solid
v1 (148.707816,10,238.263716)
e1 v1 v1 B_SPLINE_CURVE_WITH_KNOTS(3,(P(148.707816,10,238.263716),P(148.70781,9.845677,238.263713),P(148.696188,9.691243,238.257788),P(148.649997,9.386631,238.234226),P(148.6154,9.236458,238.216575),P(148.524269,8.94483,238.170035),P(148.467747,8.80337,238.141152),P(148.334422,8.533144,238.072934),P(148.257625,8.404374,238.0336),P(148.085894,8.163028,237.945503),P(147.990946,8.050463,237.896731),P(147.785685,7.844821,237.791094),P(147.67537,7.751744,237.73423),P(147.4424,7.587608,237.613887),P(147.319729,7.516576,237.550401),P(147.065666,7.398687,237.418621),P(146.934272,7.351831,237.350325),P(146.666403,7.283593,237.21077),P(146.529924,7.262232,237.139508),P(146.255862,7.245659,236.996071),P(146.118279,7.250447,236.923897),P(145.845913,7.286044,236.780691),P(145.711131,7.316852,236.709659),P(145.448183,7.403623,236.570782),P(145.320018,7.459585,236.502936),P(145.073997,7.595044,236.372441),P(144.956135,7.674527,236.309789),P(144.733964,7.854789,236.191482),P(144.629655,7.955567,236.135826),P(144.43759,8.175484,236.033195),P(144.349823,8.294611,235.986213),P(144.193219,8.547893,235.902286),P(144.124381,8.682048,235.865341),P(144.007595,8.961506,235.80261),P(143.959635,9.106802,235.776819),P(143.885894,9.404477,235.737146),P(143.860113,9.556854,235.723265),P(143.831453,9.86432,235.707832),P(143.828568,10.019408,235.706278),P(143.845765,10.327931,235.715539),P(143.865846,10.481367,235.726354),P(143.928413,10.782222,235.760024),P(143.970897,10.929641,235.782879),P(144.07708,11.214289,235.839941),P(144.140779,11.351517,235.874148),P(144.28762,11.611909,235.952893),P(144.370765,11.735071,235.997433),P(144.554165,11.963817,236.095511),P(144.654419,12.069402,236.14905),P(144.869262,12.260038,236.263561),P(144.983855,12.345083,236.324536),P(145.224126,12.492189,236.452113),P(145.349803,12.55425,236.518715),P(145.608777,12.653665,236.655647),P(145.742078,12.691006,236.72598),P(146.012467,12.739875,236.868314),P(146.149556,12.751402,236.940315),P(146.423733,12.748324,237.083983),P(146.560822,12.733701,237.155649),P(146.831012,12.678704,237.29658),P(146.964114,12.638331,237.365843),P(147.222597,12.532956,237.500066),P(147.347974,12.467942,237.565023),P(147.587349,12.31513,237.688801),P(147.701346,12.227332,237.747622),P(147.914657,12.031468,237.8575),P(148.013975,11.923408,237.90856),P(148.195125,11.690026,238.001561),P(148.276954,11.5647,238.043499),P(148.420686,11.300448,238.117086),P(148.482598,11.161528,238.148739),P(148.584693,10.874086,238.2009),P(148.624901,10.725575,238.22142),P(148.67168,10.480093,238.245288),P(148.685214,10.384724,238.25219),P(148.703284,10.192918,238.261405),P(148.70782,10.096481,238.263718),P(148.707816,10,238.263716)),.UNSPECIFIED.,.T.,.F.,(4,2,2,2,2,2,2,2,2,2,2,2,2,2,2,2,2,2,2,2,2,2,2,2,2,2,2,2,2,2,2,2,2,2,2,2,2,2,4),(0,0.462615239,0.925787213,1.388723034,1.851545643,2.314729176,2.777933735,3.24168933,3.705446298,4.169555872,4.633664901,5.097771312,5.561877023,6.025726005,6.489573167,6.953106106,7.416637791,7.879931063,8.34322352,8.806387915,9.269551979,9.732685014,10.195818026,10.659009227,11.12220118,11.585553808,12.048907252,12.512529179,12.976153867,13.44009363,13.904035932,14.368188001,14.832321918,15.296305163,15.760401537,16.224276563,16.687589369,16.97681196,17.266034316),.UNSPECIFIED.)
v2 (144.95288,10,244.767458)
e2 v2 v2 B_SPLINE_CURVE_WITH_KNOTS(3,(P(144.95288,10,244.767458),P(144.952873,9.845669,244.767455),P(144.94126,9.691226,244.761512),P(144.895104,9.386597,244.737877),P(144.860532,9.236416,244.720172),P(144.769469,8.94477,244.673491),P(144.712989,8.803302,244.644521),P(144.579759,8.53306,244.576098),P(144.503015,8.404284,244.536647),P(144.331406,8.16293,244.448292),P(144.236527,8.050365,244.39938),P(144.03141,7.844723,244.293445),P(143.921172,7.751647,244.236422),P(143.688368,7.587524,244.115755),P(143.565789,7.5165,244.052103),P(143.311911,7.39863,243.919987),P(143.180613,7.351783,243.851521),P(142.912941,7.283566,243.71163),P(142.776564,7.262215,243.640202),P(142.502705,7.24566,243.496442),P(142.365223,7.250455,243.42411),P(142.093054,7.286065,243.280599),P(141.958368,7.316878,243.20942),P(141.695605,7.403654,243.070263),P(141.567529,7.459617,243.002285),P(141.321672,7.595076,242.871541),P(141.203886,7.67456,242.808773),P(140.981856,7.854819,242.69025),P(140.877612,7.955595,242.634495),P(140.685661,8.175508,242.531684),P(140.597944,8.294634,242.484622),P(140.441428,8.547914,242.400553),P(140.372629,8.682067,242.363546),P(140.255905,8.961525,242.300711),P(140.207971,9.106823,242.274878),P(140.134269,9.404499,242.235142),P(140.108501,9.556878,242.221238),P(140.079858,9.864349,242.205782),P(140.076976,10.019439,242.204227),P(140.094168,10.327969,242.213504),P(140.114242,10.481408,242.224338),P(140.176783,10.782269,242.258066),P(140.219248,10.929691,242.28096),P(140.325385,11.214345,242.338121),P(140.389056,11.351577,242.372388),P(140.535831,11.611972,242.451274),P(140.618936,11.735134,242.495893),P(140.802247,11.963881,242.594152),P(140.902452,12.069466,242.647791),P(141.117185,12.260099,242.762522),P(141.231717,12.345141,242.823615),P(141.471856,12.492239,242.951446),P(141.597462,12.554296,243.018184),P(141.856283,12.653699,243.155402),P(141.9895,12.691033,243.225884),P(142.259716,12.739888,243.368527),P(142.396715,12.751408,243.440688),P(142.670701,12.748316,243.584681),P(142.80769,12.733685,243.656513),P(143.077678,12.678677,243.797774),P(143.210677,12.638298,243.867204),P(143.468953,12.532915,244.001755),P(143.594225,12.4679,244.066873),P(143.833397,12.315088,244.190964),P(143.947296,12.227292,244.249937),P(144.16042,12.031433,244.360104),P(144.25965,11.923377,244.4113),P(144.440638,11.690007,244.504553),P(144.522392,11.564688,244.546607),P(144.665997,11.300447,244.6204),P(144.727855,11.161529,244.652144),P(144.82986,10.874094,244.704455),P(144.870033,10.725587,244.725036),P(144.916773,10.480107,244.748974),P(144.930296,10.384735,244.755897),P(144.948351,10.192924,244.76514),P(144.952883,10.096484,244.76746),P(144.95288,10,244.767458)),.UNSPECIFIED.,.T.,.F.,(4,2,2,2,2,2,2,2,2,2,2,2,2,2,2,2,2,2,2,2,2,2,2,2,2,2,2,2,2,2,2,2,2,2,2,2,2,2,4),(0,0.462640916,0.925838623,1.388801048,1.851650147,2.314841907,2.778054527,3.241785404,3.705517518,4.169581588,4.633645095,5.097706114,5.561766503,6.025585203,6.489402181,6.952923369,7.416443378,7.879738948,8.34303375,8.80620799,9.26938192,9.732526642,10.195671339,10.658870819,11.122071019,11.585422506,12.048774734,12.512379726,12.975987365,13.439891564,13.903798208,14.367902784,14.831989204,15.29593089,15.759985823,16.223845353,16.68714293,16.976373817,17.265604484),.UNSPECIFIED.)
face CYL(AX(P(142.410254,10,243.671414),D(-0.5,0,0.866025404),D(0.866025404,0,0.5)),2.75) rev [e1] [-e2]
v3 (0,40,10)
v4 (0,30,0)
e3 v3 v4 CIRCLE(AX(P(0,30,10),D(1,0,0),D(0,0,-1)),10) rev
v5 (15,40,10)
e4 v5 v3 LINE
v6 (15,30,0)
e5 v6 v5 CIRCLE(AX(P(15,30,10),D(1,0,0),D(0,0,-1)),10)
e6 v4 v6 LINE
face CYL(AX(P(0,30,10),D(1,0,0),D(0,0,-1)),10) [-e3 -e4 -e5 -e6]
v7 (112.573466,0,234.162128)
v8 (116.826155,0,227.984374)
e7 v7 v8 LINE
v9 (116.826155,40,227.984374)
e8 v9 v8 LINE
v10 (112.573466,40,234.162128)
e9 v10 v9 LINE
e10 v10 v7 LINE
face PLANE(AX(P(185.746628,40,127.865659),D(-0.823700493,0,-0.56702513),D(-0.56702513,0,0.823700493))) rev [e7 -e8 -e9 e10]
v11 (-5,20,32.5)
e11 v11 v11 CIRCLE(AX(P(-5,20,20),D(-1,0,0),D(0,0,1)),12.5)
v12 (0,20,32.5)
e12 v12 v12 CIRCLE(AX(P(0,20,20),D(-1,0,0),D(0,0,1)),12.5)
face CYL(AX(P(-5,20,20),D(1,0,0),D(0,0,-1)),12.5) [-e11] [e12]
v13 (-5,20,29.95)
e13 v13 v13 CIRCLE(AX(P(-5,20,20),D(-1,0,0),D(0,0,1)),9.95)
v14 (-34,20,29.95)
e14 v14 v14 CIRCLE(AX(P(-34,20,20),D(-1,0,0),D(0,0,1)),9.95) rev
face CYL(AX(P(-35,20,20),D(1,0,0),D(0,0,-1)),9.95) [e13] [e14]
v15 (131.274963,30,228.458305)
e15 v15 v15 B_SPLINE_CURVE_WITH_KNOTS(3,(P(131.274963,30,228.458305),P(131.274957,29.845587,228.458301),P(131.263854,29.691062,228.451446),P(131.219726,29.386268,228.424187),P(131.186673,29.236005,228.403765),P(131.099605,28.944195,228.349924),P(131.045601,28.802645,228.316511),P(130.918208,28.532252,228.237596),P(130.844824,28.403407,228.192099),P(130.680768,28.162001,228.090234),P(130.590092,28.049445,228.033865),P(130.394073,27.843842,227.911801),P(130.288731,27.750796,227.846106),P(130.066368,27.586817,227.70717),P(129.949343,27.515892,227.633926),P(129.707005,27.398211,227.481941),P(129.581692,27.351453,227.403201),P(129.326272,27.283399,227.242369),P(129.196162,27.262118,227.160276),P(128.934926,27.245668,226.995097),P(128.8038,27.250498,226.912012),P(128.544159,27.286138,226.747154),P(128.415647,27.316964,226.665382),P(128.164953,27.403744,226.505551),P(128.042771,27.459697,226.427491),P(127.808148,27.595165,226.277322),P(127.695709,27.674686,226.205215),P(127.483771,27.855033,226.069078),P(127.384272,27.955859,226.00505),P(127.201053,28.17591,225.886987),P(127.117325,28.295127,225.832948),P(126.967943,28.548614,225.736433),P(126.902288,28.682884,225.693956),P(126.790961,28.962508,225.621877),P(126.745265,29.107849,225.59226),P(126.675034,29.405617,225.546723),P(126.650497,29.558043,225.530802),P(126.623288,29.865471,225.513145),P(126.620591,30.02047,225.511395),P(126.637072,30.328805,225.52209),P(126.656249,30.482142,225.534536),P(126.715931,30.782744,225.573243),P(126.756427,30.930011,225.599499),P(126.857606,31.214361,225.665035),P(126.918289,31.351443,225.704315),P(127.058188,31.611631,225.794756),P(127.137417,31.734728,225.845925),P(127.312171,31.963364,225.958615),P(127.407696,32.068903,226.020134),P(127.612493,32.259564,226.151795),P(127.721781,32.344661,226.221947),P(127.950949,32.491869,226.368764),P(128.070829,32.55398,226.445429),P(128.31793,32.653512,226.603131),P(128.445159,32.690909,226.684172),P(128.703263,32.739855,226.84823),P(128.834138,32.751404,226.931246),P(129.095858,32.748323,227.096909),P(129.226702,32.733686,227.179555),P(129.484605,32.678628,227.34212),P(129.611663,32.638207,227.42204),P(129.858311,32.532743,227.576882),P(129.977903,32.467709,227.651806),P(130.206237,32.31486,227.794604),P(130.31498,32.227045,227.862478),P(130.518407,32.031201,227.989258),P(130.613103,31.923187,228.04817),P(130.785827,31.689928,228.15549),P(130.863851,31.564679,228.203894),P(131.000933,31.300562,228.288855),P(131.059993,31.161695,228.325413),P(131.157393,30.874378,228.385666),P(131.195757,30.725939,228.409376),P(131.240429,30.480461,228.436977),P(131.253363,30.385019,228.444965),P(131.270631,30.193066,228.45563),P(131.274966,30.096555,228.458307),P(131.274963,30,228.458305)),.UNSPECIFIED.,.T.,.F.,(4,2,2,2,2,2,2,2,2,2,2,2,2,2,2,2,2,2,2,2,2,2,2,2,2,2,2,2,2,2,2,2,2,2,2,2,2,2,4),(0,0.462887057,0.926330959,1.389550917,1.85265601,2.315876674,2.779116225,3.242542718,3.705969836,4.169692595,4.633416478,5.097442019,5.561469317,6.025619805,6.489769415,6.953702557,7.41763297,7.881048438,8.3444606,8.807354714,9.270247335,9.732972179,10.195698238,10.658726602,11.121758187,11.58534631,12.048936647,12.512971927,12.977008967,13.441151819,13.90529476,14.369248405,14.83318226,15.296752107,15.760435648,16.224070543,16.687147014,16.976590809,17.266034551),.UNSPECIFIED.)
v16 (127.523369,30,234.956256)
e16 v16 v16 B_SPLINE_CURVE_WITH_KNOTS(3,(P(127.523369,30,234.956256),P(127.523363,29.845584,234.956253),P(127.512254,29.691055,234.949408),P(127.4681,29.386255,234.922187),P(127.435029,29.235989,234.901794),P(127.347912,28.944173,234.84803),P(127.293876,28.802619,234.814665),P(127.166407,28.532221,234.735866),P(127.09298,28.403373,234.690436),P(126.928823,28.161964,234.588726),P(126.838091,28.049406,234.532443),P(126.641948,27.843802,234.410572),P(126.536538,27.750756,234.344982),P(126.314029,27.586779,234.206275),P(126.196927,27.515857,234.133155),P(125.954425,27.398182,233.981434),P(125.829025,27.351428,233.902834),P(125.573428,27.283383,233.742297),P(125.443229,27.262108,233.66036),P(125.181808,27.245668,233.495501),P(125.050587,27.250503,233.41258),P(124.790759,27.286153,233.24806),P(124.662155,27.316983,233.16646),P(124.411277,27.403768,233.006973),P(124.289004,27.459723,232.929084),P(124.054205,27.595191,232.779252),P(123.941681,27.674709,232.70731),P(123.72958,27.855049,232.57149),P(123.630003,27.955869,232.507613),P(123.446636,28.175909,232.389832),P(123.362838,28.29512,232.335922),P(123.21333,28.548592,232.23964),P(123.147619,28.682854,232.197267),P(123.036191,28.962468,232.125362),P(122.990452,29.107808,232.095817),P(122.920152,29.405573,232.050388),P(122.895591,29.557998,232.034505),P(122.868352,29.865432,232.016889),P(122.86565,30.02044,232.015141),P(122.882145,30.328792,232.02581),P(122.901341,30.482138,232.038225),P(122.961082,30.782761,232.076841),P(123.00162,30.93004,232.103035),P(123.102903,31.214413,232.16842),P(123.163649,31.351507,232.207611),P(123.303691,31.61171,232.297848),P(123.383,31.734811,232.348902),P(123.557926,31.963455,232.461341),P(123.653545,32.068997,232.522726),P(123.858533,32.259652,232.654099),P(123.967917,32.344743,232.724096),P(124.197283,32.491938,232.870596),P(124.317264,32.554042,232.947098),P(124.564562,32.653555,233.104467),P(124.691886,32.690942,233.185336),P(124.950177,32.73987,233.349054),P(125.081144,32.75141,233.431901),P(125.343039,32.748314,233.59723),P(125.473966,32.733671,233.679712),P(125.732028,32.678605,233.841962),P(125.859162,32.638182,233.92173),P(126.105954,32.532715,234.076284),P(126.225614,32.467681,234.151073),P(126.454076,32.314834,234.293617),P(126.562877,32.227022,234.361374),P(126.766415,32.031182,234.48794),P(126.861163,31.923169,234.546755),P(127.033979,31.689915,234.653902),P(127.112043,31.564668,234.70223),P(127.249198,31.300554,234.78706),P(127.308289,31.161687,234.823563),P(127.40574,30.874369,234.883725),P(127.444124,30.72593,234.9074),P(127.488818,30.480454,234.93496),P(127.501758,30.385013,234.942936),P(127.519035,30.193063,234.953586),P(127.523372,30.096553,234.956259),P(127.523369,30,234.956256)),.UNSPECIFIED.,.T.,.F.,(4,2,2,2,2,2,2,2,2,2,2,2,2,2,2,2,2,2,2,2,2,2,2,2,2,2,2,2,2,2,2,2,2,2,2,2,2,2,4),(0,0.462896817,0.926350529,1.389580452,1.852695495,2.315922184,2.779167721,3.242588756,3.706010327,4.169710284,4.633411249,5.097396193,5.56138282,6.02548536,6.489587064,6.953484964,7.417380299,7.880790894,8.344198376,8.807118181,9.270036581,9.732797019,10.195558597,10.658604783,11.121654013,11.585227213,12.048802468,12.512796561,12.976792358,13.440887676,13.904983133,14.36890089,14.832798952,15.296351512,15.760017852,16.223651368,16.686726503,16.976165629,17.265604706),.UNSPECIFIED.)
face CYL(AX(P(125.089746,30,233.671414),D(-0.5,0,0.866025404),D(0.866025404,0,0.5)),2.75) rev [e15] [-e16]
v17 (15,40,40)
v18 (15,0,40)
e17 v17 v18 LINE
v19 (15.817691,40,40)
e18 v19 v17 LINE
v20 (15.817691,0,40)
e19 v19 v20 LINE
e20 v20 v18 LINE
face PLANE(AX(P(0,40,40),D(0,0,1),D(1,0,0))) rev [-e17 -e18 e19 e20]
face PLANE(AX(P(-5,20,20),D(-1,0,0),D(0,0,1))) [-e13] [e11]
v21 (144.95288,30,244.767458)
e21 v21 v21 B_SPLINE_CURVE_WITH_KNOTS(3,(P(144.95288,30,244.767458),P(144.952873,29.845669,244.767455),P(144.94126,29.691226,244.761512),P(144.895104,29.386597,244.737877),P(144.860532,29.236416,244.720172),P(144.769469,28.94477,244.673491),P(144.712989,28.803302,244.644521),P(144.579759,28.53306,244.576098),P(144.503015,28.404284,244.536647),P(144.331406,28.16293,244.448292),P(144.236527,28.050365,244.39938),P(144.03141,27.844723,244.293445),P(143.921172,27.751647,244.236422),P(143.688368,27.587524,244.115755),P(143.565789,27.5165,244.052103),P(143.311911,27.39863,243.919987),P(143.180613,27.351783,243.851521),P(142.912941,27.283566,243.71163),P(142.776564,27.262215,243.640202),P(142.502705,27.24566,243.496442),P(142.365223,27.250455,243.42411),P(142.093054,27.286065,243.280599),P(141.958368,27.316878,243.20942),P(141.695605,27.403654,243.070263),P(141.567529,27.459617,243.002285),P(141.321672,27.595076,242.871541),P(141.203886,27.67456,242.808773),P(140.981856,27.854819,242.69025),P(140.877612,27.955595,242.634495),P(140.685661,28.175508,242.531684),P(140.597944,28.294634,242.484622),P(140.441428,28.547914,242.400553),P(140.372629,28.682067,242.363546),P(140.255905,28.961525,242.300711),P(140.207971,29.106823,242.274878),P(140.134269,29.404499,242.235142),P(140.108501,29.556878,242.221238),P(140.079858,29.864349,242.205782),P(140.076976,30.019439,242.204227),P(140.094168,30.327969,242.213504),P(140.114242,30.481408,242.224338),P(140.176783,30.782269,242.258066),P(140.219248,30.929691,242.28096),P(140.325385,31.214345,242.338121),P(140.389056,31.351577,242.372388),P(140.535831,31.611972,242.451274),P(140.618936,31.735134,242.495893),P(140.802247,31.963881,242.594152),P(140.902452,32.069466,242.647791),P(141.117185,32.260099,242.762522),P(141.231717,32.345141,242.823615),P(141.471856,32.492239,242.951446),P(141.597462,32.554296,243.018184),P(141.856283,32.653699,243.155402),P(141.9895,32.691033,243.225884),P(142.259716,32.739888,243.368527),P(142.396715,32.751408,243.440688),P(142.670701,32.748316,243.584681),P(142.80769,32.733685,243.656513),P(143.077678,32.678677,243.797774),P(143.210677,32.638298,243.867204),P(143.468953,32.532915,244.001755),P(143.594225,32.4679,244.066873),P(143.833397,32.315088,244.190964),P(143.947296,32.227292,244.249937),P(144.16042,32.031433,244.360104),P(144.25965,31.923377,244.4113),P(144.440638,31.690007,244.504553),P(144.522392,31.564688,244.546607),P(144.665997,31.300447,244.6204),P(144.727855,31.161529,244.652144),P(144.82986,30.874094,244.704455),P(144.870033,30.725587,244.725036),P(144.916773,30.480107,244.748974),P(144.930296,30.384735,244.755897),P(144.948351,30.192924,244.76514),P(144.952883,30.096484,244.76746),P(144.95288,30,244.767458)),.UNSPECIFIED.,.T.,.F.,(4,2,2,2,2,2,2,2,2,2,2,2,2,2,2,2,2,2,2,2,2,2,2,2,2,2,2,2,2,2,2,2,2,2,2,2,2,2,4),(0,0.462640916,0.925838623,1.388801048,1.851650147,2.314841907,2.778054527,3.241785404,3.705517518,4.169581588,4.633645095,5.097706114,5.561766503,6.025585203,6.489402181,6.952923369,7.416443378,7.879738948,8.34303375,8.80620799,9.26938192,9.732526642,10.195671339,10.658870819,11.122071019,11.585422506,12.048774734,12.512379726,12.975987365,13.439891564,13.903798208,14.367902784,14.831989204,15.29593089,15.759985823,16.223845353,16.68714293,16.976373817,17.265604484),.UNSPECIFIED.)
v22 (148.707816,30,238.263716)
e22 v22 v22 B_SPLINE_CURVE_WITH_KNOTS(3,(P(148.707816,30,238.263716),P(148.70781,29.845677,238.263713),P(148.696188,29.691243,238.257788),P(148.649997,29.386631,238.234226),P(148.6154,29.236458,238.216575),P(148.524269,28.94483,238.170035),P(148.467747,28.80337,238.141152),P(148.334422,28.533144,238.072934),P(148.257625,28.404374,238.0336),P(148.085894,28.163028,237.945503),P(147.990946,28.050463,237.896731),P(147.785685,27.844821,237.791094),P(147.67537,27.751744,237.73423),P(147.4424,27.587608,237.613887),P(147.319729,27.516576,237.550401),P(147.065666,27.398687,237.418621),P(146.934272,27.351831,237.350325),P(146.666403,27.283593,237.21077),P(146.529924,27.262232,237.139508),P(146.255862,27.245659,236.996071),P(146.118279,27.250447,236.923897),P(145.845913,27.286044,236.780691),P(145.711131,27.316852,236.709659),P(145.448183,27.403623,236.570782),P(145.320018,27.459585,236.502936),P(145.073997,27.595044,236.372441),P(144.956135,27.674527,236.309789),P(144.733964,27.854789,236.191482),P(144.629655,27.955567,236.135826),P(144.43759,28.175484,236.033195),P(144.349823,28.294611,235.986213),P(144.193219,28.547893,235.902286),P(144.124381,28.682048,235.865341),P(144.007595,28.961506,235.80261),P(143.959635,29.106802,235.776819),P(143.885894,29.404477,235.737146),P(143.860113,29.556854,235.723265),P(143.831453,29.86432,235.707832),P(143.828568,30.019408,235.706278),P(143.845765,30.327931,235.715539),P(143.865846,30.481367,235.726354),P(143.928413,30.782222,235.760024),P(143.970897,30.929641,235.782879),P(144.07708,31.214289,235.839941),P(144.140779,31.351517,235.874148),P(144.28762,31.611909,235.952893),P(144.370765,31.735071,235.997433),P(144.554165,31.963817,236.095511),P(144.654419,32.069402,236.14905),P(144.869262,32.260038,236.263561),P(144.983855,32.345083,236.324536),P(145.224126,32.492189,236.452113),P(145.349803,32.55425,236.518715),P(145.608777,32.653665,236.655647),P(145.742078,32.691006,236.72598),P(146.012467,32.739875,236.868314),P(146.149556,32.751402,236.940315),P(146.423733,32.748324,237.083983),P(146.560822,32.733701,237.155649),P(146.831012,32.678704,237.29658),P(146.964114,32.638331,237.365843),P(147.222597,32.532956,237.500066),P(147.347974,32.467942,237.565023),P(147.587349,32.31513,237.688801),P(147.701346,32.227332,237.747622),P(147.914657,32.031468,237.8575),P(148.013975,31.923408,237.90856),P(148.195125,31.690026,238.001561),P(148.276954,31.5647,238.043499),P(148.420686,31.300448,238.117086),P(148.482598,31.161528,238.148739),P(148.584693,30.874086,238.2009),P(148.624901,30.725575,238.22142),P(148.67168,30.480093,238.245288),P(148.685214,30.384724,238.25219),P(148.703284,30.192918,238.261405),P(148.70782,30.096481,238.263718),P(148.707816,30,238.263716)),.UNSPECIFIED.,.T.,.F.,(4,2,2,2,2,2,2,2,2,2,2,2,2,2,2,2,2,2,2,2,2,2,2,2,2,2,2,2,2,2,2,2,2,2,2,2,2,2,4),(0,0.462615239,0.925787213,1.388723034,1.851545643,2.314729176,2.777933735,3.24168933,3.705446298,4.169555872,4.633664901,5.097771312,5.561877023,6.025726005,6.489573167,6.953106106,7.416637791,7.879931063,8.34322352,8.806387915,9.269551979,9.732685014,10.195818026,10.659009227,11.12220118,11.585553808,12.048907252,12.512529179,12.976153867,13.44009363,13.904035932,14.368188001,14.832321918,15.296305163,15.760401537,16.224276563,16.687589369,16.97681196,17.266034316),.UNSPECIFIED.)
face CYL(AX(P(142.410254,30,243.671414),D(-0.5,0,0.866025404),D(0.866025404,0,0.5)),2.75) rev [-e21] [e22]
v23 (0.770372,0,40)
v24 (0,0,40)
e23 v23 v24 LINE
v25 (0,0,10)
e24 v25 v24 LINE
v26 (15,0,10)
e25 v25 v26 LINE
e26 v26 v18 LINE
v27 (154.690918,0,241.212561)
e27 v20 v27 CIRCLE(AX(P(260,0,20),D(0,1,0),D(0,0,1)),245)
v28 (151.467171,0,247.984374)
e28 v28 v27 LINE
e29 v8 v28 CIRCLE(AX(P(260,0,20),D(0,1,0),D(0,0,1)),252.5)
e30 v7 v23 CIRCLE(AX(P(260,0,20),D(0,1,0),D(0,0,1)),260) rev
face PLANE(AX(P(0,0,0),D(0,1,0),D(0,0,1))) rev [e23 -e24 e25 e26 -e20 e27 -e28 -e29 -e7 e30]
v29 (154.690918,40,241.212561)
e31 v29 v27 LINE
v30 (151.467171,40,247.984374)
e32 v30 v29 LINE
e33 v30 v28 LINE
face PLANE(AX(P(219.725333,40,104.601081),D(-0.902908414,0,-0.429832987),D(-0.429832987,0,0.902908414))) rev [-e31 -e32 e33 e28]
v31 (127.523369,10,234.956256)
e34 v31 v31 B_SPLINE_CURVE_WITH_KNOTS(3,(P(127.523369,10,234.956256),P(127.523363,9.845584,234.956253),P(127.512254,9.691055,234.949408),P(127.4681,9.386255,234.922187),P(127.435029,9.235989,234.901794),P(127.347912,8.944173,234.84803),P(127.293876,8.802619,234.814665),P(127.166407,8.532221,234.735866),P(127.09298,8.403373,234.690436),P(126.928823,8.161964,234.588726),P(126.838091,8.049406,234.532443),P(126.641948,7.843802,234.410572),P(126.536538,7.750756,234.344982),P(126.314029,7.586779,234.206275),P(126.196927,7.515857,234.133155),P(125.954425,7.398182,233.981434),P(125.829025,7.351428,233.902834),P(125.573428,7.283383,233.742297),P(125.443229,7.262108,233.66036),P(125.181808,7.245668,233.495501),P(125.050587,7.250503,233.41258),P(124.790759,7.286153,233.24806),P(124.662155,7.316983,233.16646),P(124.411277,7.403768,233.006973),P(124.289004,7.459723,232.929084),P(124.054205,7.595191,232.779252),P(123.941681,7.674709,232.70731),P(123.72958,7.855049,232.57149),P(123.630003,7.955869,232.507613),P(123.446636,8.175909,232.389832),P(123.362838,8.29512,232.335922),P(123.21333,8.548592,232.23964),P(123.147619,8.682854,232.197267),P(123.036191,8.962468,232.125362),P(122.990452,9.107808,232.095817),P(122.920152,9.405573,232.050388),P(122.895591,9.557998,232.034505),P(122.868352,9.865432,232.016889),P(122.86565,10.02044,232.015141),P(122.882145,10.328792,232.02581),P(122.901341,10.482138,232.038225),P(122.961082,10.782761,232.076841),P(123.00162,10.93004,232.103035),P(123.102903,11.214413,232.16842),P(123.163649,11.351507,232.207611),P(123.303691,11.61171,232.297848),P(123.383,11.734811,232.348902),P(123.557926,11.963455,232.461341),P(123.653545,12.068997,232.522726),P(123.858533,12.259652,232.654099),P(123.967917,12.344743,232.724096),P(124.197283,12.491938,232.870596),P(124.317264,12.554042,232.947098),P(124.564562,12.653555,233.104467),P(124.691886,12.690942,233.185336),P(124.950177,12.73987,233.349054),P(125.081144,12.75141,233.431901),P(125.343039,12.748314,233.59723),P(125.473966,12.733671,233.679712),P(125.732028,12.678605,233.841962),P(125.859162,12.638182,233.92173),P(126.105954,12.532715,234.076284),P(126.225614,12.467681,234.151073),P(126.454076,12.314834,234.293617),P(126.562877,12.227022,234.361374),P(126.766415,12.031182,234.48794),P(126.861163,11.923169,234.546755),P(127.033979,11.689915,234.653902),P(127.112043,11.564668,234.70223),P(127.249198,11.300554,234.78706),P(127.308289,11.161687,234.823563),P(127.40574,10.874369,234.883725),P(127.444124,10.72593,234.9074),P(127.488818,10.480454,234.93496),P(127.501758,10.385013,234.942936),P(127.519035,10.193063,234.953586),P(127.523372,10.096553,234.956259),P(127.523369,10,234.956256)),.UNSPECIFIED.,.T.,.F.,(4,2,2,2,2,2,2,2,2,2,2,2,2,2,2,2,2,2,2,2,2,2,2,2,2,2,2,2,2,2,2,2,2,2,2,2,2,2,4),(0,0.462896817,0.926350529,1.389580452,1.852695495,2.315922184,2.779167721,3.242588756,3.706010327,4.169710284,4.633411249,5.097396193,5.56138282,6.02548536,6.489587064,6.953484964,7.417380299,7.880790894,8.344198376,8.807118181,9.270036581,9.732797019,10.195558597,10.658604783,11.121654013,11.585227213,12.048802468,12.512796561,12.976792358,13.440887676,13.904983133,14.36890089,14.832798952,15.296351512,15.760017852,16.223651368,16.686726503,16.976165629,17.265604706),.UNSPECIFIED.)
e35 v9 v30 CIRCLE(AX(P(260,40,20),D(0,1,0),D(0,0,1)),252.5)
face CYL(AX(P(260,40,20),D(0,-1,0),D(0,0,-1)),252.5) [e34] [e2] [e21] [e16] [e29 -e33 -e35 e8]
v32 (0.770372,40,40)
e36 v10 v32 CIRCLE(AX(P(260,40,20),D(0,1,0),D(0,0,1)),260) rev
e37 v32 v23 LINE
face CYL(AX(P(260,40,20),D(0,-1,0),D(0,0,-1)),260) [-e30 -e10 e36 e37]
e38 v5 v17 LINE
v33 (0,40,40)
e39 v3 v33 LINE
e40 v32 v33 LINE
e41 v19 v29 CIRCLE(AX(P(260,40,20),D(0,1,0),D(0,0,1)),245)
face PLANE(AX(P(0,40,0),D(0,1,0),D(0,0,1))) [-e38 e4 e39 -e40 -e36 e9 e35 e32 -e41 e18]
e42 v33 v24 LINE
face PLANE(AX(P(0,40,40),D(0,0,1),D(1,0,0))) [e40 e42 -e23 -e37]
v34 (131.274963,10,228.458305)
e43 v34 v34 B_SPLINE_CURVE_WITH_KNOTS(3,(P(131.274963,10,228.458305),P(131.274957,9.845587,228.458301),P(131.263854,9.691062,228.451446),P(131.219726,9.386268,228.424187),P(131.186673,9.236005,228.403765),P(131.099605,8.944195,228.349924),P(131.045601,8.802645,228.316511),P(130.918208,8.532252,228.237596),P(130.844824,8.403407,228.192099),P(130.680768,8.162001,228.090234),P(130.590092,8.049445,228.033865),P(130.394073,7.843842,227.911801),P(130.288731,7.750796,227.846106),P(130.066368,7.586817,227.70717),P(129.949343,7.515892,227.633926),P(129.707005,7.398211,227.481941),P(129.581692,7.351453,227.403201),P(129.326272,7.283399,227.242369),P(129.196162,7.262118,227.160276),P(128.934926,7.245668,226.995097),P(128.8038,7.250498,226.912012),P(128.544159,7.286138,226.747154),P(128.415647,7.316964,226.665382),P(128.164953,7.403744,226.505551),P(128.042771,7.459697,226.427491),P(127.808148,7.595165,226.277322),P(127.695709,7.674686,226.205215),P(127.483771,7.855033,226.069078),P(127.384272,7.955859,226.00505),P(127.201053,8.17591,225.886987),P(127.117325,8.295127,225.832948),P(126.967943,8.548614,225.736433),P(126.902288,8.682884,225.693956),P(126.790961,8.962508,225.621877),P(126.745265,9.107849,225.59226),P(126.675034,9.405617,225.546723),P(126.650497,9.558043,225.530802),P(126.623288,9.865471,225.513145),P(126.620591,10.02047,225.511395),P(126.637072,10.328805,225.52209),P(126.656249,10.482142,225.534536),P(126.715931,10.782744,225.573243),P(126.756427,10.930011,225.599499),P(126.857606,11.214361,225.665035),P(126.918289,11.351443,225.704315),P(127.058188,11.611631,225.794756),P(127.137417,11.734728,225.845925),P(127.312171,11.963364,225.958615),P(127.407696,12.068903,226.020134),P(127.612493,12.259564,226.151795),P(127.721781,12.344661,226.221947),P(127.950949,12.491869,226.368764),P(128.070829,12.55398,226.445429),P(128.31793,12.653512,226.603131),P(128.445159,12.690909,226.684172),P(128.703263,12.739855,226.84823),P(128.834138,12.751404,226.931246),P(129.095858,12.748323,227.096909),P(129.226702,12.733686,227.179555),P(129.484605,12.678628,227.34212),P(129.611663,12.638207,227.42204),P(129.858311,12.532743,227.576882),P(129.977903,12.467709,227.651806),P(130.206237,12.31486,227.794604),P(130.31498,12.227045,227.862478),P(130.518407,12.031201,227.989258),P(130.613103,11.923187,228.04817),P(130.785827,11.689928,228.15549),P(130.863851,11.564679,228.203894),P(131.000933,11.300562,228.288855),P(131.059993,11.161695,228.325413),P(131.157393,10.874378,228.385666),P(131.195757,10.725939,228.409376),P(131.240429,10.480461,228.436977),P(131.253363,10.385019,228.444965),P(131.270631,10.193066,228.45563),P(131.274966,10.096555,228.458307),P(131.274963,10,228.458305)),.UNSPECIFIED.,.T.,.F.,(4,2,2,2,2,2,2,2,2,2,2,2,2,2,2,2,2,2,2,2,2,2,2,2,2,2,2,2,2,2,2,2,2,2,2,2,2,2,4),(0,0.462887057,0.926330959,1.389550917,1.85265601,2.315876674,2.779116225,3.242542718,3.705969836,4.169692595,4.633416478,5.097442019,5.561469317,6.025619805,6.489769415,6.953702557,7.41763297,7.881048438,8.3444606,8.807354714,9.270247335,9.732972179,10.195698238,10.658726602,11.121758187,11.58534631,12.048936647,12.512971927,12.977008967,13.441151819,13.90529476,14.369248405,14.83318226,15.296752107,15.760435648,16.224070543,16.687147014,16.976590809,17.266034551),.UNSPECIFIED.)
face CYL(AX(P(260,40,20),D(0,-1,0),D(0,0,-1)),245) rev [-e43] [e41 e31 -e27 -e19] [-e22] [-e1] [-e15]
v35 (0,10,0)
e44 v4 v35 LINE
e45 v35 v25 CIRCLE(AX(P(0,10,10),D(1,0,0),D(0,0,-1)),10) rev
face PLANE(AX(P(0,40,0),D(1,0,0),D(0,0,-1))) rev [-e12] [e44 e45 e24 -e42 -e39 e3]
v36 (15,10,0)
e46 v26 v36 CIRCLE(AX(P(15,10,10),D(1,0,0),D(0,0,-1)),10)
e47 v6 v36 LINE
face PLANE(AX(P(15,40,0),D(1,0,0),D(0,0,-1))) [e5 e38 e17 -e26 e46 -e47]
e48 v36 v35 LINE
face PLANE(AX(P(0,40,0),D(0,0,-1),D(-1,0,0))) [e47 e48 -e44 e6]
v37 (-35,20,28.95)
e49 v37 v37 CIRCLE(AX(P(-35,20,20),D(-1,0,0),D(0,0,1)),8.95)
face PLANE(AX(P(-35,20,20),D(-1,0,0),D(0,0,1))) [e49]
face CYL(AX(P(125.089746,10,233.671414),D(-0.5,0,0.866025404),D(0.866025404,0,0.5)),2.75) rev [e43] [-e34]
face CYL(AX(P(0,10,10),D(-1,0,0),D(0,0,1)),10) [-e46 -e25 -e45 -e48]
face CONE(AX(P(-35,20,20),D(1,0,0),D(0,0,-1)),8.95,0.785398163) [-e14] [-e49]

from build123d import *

# Parameters (mm, degrees)
BOSS_EXTRUDE4_DEPTH          = 40
SKETCH18_R                   = 12.5
BOSS_EXTRUDE2_DEPTH          = 5
SKETCH19_R                   = 9.95
BOSS_EXTRUDE3_DEPTH          = 30
FILLET1_R                    = 10
M5_START                     = -139.716402581
M5_CLEARANCE_HOLE2_OUTLINE_R = 2.75
M5_CLEARANCE_HOLE2_DEPTH     = 7.727879289
CHAMFER1_SIZE                = 1


# Read off the part's stored shape, not the designer's step: M5 Clearance Hole2
with BuildPart() as part:
    # Sketch20 → Boss-Extrude4 (new body)
    with BuildSketch(Plane(origin=(0, 0, 0), x_dir=(1, 0, 0), z_dir=(0, 1, 0))):
        with BuildLine():
            Line((112.573466187, -234.162128136), (116.826154662, -227.98437444))
            ThreePointArc((116.826154662, -227.98437444), (133.75, -238.671414456), (151.467170814, -247.98437444))
            Line((151.467170814, -247.98437444), (154.690918215, -241.212561338))
            ThreePointArc((154.690918215, -241.212561338), (58.362499128, -159.166512646), (15.817691059, -40))
            Line((15.817691059, -40), (15, -40))
            Line((15, -40), (15, -20))
            Line((15, -20), (15, 0))
            Line((15, 0), (0, 0))
            Line((0, 0), (0, -20))
            Line((0, -20), (0, -40))
            Line((0, -40), (0.770372064, -40))
            ThreePointArc((0.770372064, -40), (34.68457338, -149.741891952), (112.573466187, -234.162128136))
        make_face()
    extrude(amount=BOSS_EXTRUDE4_DEPTH)

    # Sketch18 → Boss-Extrude2 (add)
    with BuildSketch(Plane.ZY):
        with Locations((20, 20)):
            Circle(SKETCH18_R)
    extrude(amount=BOSS_EXTRUDE2_DEPTH)

    # Sketch19 → Boss-Extrude3 (add)
    with BuildSketch(Plane.ZY.offset(5)):
        with Locations((20, 20)):
            Circle(SKETCH19_R)
    extrude(amount=BOSS_EXTRUDE3_DEPTH)

    # Fillet1
    fillet1_edges = [part.edges().sort_by_distance(p)[0] for p in [
        (7.5, 0, 0),
        (7.5, 40, 0),
    ]]
    fillet(fillet1_edges, radius=FILLET1_R)

    # M5 Clearance Hole2 outline → M5 Clearance Hole2 (cut)
    with BuildSketch(Plane(origin=(0, 0, 0), x_dir=(0.8660254037844398, 0, 0.499999999999998), z_dir=(0.49999999999999795, 0, -0.8660254037844399)).offset(M5_START)):
        with Locations((245.166604984, -30)):
            Circle(M5_CLEARANCE_HOLE2_OUTLINE_R)
        with Locations((225.166604984, -10)):
            Circle(M5_CLEARANCE_HOLE2_OUTLINE_R)
        with Locations((225.166604984, -30)):
            Circle(M5_CLEARANCE_HOLE2_OUTLINE_R)
        with Locations((245.166604984, -10)):
            Circle(M5_CLEARANCE_HOLE2_OUTLINE_R)
    extrude(amount=M5_CLEARANCE_HOLE2_DEPTH, mode=Mode.SUBTRACT)

    # Chamfer1
    chamfer1_edges = [part.edges().sort_by_distance(p)[0] for p in [
        (-35, 20, 10.05),
    ]]
    chamfer(chamfer1_edges, length=CHAMFER1_SIZE)


solid = part.part
